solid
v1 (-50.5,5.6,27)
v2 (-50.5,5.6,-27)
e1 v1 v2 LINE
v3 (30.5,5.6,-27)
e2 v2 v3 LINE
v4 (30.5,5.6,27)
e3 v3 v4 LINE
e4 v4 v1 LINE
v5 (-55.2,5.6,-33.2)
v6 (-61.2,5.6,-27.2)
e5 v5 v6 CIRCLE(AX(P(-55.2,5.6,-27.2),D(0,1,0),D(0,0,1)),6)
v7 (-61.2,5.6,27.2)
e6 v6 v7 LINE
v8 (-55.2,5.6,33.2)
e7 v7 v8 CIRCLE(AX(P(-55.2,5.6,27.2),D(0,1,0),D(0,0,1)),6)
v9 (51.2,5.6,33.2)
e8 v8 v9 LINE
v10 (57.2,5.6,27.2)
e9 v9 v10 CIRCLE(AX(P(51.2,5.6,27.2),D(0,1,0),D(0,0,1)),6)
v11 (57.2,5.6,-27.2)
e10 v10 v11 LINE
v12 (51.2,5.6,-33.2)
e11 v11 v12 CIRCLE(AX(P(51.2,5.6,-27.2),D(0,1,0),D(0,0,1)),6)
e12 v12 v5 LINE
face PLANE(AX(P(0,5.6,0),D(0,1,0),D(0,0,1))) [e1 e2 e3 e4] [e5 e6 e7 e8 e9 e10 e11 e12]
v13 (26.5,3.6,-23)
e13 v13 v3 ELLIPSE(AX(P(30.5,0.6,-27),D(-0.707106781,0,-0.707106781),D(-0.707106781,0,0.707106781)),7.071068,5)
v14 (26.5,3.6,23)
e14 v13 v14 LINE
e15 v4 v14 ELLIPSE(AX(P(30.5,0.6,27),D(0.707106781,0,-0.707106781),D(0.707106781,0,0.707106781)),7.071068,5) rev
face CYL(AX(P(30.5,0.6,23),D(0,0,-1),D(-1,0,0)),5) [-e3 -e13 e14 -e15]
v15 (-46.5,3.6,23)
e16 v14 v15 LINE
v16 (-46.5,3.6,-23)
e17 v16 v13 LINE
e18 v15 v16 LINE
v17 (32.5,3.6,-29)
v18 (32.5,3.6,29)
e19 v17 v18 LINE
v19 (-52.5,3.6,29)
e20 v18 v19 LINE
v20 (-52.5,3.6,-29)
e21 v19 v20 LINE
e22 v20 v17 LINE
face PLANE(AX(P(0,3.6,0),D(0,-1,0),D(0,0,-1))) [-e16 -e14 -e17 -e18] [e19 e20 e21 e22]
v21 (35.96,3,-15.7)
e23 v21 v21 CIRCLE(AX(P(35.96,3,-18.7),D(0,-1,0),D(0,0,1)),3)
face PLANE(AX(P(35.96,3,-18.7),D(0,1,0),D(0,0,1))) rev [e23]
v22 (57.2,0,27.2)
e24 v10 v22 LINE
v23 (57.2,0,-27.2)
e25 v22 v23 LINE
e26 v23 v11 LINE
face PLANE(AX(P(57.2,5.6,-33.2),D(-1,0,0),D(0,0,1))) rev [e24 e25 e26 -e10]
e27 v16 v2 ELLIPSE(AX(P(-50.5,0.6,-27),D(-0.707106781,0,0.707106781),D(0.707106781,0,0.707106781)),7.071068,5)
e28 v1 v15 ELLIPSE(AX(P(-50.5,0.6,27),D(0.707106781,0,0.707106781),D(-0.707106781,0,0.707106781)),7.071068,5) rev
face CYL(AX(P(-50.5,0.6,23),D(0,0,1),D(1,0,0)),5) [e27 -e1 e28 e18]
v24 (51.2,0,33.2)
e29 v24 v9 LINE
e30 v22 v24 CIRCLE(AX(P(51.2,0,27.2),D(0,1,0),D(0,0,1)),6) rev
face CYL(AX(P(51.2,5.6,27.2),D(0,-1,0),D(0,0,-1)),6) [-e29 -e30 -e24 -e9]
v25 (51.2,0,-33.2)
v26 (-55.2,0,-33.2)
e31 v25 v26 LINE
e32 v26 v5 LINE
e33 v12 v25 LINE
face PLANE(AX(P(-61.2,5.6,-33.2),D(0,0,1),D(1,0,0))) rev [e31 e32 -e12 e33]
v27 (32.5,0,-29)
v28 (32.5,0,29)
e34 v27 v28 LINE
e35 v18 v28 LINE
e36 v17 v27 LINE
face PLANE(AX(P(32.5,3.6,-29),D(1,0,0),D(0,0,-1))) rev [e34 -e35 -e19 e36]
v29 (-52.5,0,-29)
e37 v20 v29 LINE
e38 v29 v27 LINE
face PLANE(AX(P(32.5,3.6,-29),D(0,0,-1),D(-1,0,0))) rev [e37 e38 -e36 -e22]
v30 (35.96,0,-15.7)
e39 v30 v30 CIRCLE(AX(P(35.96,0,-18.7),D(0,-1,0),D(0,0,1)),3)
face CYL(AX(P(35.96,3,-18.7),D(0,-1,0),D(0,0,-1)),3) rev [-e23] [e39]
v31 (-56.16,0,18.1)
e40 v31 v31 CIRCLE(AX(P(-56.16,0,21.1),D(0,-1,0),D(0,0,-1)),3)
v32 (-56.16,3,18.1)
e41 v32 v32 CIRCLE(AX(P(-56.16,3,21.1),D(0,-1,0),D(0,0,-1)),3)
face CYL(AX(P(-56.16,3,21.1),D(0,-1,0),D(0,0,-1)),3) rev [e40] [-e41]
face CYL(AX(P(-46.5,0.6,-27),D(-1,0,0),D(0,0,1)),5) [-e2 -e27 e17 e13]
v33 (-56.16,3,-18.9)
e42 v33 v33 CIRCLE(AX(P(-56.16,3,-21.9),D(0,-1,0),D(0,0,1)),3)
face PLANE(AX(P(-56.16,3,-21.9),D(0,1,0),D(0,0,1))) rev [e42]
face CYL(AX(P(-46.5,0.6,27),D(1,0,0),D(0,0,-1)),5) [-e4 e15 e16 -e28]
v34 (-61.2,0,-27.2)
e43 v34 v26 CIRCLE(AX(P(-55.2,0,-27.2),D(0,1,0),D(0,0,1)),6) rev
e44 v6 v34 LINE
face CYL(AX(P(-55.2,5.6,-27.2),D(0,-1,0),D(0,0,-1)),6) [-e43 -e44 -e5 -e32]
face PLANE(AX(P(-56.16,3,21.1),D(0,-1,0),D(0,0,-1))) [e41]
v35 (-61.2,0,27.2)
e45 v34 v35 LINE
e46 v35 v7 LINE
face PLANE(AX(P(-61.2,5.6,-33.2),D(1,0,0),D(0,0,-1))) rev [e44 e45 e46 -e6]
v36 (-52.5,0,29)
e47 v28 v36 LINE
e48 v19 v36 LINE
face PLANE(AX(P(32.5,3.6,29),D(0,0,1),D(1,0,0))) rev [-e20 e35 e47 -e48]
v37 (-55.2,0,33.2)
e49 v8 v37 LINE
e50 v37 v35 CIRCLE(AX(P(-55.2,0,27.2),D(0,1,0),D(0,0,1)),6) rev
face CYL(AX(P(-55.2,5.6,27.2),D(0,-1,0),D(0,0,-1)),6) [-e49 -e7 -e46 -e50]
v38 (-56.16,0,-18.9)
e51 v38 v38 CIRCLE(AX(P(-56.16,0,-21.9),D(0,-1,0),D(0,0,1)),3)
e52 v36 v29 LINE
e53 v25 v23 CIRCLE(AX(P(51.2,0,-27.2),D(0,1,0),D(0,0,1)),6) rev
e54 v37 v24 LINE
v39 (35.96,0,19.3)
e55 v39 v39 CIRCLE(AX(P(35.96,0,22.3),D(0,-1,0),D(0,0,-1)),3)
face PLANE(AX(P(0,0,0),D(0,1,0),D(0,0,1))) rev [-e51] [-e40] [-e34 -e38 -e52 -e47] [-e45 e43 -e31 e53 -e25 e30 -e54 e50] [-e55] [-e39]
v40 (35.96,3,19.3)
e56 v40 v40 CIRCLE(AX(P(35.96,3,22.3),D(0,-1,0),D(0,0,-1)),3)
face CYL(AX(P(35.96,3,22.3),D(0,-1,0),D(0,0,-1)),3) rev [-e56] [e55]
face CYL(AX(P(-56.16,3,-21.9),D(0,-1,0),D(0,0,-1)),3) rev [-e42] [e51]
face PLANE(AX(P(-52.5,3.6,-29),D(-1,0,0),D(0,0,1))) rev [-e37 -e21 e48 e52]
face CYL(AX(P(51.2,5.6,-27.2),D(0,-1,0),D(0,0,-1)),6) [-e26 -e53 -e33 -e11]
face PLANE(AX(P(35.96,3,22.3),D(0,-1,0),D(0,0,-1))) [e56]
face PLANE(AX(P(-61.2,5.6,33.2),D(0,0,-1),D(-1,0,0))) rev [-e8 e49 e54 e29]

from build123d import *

# Parameters (mm, degrees)
SKETCH_1_W            = 118.4
SKETCH_1_H            = 66.4
EXTRUDE_1_DEPTH       = 5.6
SKETCH_5_R            = 3
CUT_EXTRUDE_961_DEPTH = 3
SKETCH_7_W            = 85
SKETCH_7_H            = 58
LCD_DEPTH             = 3.6
SKETCH_13_W           = 73
SKETCH_13_H           = 46
CUT_EXTRUDE_1_DEPTH   = 10
FILLET_2_R            = 5
FILLET_3_R            = 6


with BuildPart() as part:
    # Эскиз1 → Бобышка-Вытянуть1 (new body)
    with BuildSketch(Plane(origin=(0, 0, 0), x_dir=(1, 0, 0), z_dir=(0, 1, 0))):
        with Locations((-2, 0)):
            Rectangle(SKETCH_1_W, SKETCH_1_H)
    extrude(amount=EXTRUDE_1_DEPTH)

    # Эскиз5 → Cut-Extrude 961 (cut)
    with BuildSketch(Plane.XZ):
        with Locations(Location((-56.16, 21.1, 0), (0, 0, 270))):
            Circle(SKETCH_5_R)
        with Locations(Location((-56.16, -21.9, 0), (0, 0, 90))):
            Circle(SKETCH_5_R)
        with Locations(Location((35.96, 22.3, 0), (0, 0, 270))):
            Circle(SKETCH_5_R)
        with Locations(Location((35.96, -18.7, 0), (0, 0, 90))):
            Circle(SKETCH_5_R)
    extrude(amount=-CUT_EXTRUDE_961_DEPTH, mode=Mode.SUBTRACT)

    # Эскиз7 → под LCD (cut)
    with BuildSketch(Plane.XZ):
        with Locations((-10, 0)):
            Rectangle(SKETCH_7_W, SKETCH_7_H)
    extrude(amount=-LCD_DEPTH, mode=Mode.SUBTRACT)

    # Эскиз13 → Вырез-Вытянуть1 (cut)
    with BuildSketch(Plane.XZ.offset(-3.6)):
        with Locations((-10, 0)):
            Rectangle(SKETCH_13_W, SKETCH_13_H)
    extrude(amount=-CUT_EXTRUDE_1_DEPTH, mode=Mode.SUBTRACT)

    # Скругление2
    # the kernel refuses this fillet: 5 mm, written as the material it takes off along each edge
    with BuildSketch(Plane(origin=(-46.5, 5.6, -23), x_dir=(-1, 0, 0), z_dir=(0, 0, 1)), Plane(origin=(26.5, 5.6, 23), x_dir=(1, 0, 0), z_dir=(0, 0, -1))) as fillet_2_piece_1:
        with BuildLine():
            CenterArc((4, 5), FILLET_2_R, 216.869897646, 53.130102354)
            Line((0, 2), (-0.08, 1.94))
            ThreePointArc((-0.08, 1.94), (-0.1, 1), (-0.1, 0))
            Line((-0.1, 0), (0, -0.1))
            Line((0, -0.1), (4, -0.1))
            Line((4, -0.1), (4, 0))
        make_face()
    extrude(amount=46, mode=Mode.SUBTRACT)
    with BuildSketch(Plane(origin=(-46.5, 5.6, 23), x_dir=(0, 0, 1), z_dir=(1, 0, 0)), Plane(origin=(26.5, 5.6, -23), x_dir=(0, 0, -1), z_dir=(-1, 0, 0))) as fillet_2_piece_2:
        with BuildLine():
            CenterArc((4, 5), FILLET_2_R, 216.869897646, 53.130102354)
            Line((0, 2), (-0.08, 1.94))
            ThreePointArc((-0.08, 1.94), (-0.1, 1), (-0.1, 0))
            Line((-0.1, 0), (0, -0.1))
            Line((0, -0.1), (4, -0.1))
            Line((4, -0.1), (4, 0))
        make_face()
    extrude(amount=73, mode=Mode.SUBTRACT)
    with BuildSketch(Plane(origin=(-46.5, 5.6, -33), x_dir=(-1, 0, 0), z_dir=(0, 0, 1))) as fillet_2_piece_3a_section:
        with BuildLine():
            CenterArc((4, 5), FILLET_2_R, 216.869897646, 53.130102354)
            Line((0, 2), (-0.08, 1.94))
            ThreePointArc((-0.08, 1.94), (-0.1, 1), (-0.1, 0))
            Line((-0.1, 0), (0, -0.1))
            Line((0, -0.1), (4, -0.1))
            Line((4, -0.1), (4, 0))
        make_face()
    fillet_2_piece_3a = extrude(amount=56, mode=Mode.PRIVATE)
    fillet_2_piece_3a = split(fillet_2_piece_3a, bisect_by=Plane(origin=(-47.529417057, 5.088057438, -23), z_dir=(0, 0, -1)), keep=Keep.TOP, mode=Mode.PRIVATE)
    with BuildSketch(Plane(origin=(26.5, 5.6, -23), x_dir=(0, 0, -1), z_dir=(-1, 0, 0))) as fillet_2_piece_3b_section:
        with BuildLine():
            CenterArc((4, 5), FILLET_2_R, 216.869897646, 53.130102354)
            Line((0, 2), (-0.08, 1.94))
            ThreePointArc((-0.08, 1.94), (-0.1, 1), (-0.1, 0))
            Line((-0.1, 0), (0, -0.1))
            Line((0, -0.1), (4, -0.1))
            Line((4, -0.1), (4, 0))
        make_face()
    fillet_2_piece_3b = extrude(amount=83, mode=Mode.PRIVATE)
    fillet_2_piece_3b = split(fillet_2_piece_3b, bisect_by=Plane(origin=(-46.5, 5.088057438, -24.029417057), z_dir=(-1, 0, 0)), keep=Keep.TOP, mode=Mode.PRIVATE)
    fillet_2_piece_3 = fillet_2_piece_3a & fillet_2_piece_3b
    add(fillet_2_piece_3, mode=Mode.SUBTRACT)
    with BuildSketch(Plane(origin=(-46.5, 5.6, -23), x_dir=(-1, 0, 0), z_dir=(0, 0, 1))) as fillet_2_piece_4a_section:
        with BuildLine():
            CenterArc((4, 5), FILLET_2_R, 216.869897646, 53.130102354)
            Line((0, 2), (-0.08, 1.94))
            ThreePointArc((-0.08, 1.94), (-0.1, 1), (-0.1, 0))
            Line((-0.1, 0), (0, -0.1))
            Line((0, -0.1), (4, -0.1))
            Line((4, -0.1), (4, 0))
        make_face()
    fillet_2_piece_4a = extrude(amount=56, mode=Mode.PRIVATE)
    fillet_2_piece_4a = split(fillet_2_piece_4a, bisect_by=Plane(origin=(-47.529417057, 5.088057438, 23), z_dir=(0, 0, 1)), keep=Keep.TOP, mode=Mode.PRIVATE)
    with BuildSketch(Plane(origin=(-56.5, 5.6, 23), x_dir=(0, 0, 1), z_dir=(1, 0, 0))) as fillet_2_piece_4b_section:
        with BuildLine():
            CenterArc((4, 5), FILLET_2_R, 216.869897646, 53.130102354)
            Line((0, 2), (-0.08, 1.94))
            ThreePointArc((-0.08, 1.94), (-0.1, 1), (-0.1, 0))
            Line((-0.1, 0), (0, -0.1))
            Line((0, -0.1), (4, -0.1))
            Line((4, -0.1), (4, 0))
        make_face()
    fillet_2_piece_4b = extrude(amount=83, mode=Mode.PRIVATE)
    fillet_2_piece_4b = split(fillet_2_piece_4b, bisect_by=Plane(origin=(-46.5, 5.088057438, 24.029417057), z_dir=(-1, 0, 0)), keep=Keep.TOP, mode=Mode.PRIVATE)
    fillet_2_piece_4 = fillet_2_piece_4a & fillet_2_piece_4b
    add(fillet_2_piece_4, mode=Mode.SUBTRACT)
    with BuildSketch(Plane(origin=(26.5, 5.6, 33), x_dir=(1, 0, 0), z_dir=(0, 0, -1))) as fillet_2_piece_5a_section:
        with BuildLine():
            CenterArc((4, 5), FILLET_2_R, 216.869897646, 53.130102354)
            Line((0, 2), (-0.08, 1.94))
            ThreePointArc((-0.08, 1.94), (-0.1, 1), (-0.1, 0))
            Line((-0.1, 0), (0, -0.1))
            Line((0, -0.1), (4, -0.1))
            Line((4, -0.1), (4, 0))
        make_face()
    fillet_2_piece_5a = extrude(amount=56, mode=Mode.PRIVATE)
    fillet_2_piece_5a = split(fillet_2_piece_5a, bisect_by=Plane(origin=(27.529417057, 5.088057438, 23), z_dir=(0, 0, 1)), keep=Keep.TOP, mode=Mode.PRIVATE)
    with BuildSketch(Plane(origin=(-46.5, 5.6, 23), x_dir=(0, 0, 1), z_dir=(1, 0, 0))) as fillet_2_piece_5b_section:
        with BuildLine():
            CenterArc((4, 5), FILLET_2_R, 216.869897646, 53.130102354)
            Line((0, 2), (-0.08, 1.94))
            ThreePointArc((-0.08, 1.94), (-0.1, 1), (-0.1, 0))
            Line((-0.1, 0), (0, -0.1))
            Line((0, -0.1), (4, -0.1))
            Line((4, -0.1), (4, 0))
        make_face()
    fillet_2_piece_5b = extrude(amount=83, mode=Mode.PRIVATE)
    fillet_2_piece_5b = split(fillet_2_piece_5b, bisect_by=Plane(origin=(26.5, 5.088057438, 24.029417057), z_dir=(1, 0, 0)), keep=Keep.TOP, mode=Mode.PRIVATE)
    fillet_2_piece_5 = fillet_2_piece_5a & fillet_2_piece_5b
    add(fillet_2_piece_5, mode=Mode.SUBTRACT)
    with BuildSketch(Plane(origin=(36.5, 5.6, -23), x_dir=(0, 0, -1), z_dir=(-1, 0, 0))) as fillet_2_piece_6a_section:
        with BuildLine():
            CenterArc((4, 5), FILLET_2_R, 216.869897646, 53.130102354)
            Line((0, 2), (-0.08, 1.94))
            ThreePointArc((-0.08, 1.94), (-0.1, 1), (-0.1, 0))
            Line((-0.1, 0), (0, -0.1))
            Line((0, -0.1), (4, -0.1))
            Line((4, -0.1), (4, 0))
        make_face()
    fillet_2_piece_6a = extrude(amount=83, mode=Mode.PRIVATE)
    fillet_2_piece_6a = split(fillet_2_piece_6a, bisect_by=Plane(origin=(26.5, 5.088057438, -24.029417057), z_dir=(1, 0, 0)), keep=Keep.TOP, mode=Mode.PRIVATE)
    with BuildSketch(Plane(origin=(26.5, 5.6, 23), x_dir=(1, 0, 0), z_dir=(0, 0, -1))) as fillet_2_piece_6b_section:
        with BuildLine():
            CenterArc((4, 5), FILLET_2_R, 216.869897646, 53.130102354)
            Line((0, 2), (-0.08, 1.94))
            ThreePointArc((-0.08, 1.94), (-0.1, 1), (-0.1, 0))
            Line((-0.1, 0), (0, -0.1))
            Line((0, -0.1), (4, -0.1))
            Line((4, -0.1), (4, 0))
        make_face()
    fillet_2_piece_6b = extrude(amount=56, mode=Mode.PRIVATE)
    fillet_2_piece_6b = split(fillet_2_piece_6b, bisect_by=Plane(origin=(27.529417057, 5.088057438, -23), z_dir=(0, 0, -1)), keep=Keep.TOP, mode=Mode.PRIVATE)
    fillet_2_piece_6 = fillet_2_piece_6a & fillet_2_piece_6b
    add(fillet_2_piece_6, mode=Mode.SUBTRACT)

    # Скругление3
    fillet_3_edges = [part.edges().sort_by_distance(p)[0] for p in [
        (-61.2, 2.8, -33.2),
        (57.2, 2.8, -33.2),
        (57.2, 2.8, 33.2),
        (-61.2, 2.8, 33.2),
    ]]
    fillet(fillet_3_edges, radius=FILLET_3_R)


solid = part.part
